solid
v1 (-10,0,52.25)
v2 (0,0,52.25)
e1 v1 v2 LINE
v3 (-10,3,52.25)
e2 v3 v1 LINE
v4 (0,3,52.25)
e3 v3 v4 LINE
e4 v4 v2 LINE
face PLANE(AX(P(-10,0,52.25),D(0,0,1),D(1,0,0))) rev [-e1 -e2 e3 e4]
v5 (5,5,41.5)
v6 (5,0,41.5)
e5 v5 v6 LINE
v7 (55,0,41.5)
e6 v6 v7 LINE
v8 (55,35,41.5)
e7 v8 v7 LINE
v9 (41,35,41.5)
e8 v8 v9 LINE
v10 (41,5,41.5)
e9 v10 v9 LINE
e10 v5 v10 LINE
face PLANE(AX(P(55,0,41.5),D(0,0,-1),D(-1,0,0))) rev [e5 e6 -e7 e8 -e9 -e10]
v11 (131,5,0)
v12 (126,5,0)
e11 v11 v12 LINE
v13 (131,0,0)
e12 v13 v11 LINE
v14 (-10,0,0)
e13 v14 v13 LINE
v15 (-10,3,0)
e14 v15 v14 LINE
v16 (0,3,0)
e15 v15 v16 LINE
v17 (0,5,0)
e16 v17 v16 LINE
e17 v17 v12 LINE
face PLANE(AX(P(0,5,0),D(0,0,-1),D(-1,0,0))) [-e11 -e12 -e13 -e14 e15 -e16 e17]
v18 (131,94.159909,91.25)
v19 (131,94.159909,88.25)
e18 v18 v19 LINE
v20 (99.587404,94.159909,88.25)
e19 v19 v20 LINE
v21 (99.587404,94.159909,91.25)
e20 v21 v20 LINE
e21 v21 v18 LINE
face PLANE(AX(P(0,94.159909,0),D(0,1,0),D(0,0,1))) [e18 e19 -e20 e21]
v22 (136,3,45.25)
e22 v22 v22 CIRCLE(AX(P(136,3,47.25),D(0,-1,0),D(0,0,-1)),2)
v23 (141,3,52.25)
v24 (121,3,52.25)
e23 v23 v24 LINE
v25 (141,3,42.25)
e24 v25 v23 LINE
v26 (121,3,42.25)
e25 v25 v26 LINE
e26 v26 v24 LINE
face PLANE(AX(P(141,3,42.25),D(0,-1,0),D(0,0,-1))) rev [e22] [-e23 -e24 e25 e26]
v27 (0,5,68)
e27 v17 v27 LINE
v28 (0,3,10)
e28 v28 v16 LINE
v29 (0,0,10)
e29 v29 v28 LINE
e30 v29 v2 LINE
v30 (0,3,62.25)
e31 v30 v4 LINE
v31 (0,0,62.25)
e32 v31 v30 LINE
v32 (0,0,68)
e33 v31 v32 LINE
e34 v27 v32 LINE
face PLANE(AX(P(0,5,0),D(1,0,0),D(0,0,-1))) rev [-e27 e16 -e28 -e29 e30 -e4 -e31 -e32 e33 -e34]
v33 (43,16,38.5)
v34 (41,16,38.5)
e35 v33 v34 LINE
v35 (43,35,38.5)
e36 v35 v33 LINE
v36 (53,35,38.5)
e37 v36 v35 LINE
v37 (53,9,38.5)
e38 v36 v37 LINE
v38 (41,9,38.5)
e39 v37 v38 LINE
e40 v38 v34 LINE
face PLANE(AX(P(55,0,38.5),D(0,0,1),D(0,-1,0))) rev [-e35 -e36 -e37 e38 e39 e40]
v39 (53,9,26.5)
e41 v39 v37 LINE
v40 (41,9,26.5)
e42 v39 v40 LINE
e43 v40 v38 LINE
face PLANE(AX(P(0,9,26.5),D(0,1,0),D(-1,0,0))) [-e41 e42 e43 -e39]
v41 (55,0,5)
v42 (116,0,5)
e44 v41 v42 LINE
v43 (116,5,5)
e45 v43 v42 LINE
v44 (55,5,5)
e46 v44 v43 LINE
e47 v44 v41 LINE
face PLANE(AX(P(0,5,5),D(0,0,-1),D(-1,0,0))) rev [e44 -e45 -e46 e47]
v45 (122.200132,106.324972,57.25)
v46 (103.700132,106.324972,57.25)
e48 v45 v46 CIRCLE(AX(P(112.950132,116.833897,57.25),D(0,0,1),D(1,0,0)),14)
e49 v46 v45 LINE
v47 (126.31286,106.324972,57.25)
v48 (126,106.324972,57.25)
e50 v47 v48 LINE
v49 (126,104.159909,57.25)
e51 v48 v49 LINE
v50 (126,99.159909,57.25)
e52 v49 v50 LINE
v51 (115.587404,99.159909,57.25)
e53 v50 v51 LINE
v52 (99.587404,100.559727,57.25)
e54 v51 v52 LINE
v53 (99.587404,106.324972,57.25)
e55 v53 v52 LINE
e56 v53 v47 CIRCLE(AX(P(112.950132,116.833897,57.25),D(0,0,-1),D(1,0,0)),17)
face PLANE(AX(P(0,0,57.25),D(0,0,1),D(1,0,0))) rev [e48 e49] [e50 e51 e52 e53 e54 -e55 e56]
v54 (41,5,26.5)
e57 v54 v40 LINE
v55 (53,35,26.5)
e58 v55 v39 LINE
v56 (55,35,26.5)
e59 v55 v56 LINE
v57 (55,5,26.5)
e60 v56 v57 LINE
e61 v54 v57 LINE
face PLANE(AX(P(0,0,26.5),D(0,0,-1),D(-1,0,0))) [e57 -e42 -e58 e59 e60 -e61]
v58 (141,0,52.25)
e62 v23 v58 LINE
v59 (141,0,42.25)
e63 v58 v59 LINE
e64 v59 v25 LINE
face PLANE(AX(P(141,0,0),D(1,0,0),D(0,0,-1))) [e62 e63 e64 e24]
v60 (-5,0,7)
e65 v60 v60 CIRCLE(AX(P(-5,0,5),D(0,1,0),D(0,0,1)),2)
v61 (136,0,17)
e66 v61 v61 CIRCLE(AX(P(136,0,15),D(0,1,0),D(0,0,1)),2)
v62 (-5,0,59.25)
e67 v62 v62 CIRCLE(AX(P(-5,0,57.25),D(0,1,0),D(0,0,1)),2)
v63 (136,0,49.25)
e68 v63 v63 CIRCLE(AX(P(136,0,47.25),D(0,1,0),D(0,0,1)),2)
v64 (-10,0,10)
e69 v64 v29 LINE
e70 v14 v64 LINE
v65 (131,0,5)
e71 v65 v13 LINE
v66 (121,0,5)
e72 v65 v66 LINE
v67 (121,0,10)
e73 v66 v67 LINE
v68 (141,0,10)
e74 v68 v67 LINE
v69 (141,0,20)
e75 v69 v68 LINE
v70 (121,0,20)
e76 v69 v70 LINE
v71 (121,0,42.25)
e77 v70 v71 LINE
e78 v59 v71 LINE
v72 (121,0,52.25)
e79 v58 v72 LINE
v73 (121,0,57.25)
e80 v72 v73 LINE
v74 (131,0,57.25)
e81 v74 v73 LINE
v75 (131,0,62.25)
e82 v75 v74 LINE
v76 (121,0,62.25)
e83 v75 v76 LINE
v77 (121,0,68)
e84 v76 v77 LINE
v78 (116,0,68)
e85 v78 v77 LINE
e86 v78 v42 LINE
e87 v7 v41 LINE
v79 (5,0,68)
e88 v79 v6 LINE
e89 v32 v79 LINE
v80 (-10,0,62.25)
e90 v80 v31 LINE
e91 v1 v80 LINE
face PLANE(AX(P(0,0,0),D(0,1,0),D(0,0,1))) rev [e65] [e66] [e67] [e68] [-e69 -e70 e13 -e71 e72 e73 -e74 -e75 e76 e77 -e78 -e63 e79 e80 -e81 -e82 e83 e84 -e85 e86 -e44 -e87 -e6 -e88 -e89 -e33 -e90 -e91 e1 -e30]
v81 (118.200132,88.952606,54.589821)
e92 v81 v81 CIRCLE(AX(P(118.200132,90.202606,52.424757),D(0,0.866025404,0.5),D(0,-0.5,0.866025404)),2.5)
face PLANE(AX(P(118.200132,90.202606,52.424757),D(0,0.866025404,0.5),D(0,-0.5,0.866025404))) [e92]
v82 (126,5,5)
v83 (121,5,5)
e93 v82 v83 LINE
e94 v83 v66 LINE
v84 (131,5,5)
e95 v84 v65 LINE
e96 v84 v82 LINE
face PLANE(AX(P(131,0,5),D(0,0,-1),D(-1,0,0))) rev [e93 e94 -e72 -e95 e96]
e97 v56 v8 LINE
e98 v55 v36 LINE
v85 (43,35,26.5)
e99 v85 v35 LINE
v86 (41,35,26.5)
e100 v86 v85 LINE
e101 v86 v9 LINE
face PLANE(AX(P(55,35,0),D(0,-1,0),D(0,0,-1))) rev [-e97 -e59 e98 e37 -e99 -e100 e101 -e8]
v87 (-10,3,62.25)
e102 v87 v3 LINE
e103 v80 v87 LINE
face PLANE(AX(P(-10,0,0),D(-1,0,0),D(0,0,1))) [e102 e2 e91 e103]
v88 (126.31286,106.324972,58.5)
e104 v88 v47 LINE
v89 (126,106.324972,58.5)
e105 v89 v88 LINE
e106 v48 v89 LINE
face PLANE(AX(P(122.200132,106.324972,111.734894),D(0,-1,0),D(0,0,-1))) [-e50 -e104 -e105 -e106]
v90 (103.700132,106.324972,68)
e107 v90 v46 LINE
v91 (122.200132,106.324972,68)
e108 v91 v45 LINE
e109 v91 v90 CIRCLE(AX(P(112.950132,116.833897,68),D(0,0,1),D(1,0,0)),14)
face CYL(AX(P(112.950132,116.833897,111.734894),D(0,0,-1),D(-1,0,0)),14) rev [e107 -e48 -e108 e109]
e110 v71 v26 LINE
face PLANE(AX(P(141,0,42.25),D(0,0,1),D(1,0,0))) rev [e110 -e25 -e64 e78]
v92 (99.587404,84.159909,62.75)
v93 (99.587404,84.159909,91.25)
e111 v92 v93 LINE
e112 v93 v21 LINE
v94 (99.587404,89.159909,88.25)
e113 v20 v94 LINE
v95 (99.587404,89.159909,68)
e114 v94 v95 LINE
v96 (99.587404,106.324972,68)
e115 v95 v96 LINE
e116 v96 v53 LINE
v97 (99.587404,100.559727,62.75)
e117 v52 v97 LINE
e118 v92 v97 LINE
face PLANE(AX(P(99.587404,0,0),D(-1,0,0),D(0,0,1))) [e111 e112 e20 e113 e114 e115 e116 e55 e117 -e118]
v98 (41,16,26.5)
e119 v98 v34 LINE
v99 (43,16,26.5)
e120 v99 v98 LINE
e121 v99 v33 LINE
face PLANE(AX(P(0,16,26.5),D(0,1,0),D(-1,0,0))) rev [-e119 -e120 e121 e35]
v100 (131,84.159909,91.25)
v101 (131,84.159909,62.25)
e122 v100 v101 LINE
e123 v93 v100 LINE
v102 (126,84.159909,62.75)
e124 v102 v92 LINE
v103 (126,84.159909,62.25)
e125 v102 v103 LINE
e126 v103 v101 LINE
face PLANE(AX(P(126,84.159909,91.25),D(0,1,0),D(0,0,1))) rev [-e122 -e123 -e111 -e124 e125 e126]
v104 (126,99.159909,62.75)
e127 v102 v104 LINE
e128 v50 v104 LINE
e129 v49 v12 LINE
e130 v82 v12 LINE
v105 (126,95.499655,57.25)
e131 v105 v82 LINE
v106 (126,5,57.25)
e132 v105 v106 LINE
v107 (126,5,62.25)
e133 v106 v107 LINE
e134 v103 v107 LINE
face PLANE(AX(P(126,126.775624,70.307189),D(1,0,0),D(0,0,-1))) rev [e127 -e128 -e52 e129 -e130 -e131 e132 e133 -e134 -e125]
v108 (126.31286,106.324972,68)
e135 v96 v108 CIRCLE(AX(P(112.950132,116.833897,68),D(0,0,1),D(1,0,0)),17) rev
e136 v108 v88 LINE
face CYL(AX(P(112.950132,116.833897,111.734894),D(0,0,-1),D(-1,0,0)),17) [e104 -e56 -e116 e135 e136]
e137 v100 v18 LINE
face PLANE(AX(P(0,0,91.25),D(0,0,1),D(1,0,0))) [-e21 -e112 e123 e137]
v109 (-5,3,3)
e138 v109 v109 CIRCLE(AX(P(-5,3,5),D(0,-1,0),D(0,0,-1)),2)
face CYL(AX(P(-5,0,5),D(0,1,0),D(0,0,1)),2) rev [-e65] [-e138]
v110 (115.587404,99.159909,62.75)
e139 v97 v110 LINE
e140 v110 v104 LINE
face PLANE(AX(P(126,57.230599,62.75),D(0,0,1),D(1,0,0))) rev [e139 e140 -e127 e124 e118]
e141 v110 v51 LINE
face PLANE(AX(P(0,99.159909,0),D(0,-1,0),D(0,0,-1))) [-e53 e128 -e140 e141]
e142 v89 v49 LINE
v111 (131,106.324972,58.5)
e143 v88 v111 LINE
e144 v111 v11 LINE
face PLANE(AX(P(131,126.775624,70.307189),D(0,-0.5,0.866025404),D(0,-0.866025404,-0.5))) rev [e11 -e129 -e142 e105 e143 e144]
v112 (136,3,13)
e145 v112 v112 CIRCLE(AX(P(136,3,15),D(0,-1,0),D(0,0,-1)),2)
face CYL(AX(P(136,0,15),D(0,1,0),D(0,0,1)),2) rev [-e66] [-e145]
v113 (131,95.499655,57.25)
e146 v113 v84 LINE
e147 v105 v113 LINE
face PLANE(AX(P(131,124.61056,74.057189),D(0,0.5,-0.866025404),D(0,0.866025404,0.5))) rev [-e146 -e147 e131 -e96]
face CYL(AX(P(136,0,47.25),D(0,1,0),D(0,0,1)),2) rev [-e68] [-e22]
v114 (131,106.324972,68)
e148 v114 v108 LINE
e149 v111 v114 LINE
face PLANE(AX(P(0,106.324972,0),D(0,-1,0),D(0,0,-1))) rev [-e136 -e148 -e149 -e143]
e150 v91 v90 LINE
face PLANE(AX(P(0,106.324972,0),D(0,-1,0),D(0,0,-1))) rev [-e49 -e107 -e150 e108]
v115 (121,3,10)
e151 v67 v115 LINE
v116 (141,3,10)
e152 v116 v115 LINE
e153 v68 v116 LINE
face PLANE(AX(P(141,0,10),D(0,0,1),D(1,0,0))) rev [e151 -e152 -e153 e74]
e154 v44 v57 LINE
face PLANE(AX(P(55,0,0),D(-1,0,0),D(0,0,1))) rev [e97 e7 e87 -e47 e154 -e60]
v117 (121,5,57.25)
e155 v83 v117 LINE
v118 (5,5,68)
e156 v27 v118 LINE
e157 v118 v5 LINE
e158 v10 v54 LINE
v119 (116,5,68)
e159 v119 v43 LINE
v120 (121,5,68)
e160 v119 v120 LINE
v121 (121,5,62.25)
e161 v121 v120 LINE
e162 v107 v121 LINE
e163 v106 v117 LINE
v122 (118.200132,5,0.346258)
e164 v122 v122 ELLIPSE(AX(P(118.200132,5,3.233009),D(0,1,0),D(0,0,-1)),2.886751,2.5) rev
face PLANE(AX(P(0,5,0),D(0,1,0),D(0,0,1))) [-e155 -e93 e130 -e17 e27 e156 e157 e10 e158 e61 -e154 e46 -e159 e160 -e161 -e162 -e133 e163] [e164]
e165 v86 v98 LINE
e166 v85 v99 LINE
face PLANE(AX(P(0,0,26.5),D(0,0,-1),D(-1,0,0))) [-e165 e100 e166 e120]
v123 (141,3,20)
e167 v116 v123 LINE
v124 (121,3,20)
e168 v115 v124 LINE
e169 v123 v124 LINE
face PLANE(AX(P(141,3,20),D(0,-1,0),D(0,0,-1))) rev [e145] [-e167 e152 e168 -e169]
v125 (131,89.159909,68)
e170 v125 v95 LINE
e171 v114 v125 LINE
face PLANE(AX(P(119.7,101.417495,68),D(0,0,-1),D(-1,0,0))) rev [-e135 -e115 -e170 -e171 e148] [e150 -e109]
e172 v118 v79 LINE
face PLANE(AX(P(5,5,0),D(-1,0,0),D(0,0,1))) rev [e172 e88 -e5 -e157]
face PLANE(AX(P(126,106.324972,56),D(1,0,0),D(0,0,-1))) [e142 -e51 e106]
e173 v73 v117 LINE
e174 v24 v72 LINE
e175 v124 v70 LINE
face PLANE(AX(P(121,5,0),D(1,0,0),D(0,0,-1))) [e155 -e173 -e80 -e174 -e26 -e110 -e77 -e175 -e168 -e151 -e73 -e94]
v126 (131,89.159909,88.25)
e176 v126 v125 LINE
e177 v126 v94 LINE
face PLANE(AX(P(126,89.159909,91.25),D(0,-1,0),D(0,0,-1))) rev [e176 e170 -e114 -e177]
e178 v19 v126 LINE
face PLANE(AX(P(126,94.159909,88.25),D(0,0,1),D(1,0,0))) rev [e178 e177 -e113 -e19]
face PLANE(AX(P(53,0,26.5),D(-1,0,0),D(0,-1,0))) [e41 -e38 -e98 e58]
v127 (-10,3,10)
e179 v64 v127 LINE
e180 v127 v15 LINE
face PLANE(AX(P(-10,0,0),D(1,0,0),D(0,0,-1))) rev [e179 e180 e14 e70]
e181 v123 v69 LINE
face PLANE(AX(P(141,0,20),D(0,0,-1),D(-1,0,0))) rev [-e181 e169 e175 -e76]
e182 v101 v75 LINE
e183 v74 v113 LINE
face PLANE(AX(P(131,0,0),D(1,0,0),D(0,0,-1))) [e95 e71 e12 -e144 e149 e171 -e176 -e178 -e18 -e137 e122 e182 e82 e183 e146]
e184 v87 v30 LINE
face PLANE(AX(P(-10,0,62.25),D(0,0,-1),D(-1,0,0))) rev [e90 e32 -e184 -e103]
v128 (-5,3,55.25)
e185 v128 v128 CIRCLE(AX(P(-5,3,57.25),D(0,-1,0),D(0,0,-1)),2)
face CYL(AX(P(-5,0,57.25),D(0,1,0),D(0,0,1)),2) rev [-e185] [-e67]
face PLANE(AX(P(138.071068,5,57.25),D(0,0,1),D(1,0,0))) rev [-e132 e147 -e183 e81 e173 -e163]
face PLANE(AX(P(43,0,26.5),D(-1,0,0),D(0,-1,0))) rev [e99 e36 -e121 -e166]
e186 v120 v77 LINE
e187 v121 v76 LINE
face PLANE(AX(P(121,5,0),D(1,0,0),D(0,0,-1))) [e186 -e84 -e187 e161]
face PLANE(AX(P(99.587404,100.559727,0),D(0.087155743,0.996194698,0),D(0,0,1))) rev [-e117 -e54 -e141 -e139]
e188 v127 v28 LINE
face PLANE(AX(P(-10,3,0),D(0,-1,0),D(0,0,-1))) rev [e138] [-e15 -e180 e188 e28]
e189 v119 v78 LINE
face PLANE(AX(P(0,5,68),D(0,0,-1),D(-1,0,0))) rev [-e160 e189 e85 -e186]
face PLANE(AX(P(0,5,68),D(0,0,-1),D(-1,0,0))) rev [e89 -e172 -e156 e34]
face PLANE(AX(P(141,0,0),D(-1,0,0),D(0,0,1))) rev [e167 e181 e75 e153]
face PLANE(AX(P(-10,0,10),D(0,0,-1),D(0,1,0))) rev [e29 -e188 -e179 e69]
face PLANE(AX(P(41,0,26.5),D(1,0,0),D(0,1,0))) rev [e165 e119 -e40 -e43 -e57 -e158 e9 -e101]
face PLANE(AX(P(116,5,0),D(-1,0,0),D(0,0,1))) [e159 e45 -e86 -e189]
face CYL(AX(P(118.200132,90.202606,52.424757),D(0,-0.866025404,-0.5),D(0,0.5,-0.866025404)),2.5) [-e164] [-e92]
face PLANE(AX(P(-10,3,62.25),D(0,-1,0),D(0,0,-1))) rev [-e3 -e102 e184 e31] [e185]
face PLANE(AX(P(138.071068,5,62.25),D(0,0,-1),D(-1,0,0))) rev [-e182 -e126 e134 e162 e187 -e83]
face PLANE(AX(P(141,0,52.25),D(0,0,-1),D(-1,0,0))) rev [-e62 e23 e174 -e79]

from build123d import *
from OCP.BRepAlgoAPI import BRepAlgoAPI_Cut
from OCP.TopTools import TopTools_ListOfShape

# Parameters (mm, degrees)
BOSS_EXTRUDE1_DEPTH              = 5
SKETCH2_R                        = 2.5
BOSS_EXTRUDE2_DEPTH              = 100
SKETCH3_W                        = 5
SKETCH3_H                        = 5
BOSS_EXTRUDE3_DEPTH              = 10
SKETCH5_W                        = 5
SKETCH5_H                        = 4.330127019
BOSS_EXTRUDE4_DEPTH              = 117
SKETCH6_W                        = 5
SKETCH6_H                        = 5
BOSS_EXTRUDE5_DEPTH              = 20
BOSS_EXTRUDE6_DEPTH              = 15
SKETCH9_W                        = 5
SKETCH9_H                        = 5
BOSS_EXTRUDE7_DEPTH              = 10
SKETCH10_W                       = 5
SKETCH10_H                       = 5
BOSS_EXTRUDE8_DEPTH              = 99.159909
SKETCH11_W                       = 10
SKETCH11_H                       = 3
BOSS_EXTRUDE9_DEPTH              = 10
CUT_EXTRUDE1_DEPTH               = 187.084790711
CUT_EXTRUDE1_DEPTH_BACK          = 187.084790711
SKETCH13_R                       = 2
SKETCH14_W                       = 10
SKETCH14_H                       = 3
BOSS_EXTRUDE10_DEPTH             = 20
CUT_EXTRUDE2_DEPTH               = 194.255140511
CUT_EXTRUDE2_DEPTH_BACK          = 194.255140511
SKETCH15_R                       = 2
BOSS_EXTRUDE11_DEPTH             = 7.8
CUT_EXTRUDE3_DEPTH               = 187.016127587
CUT_EXTRUDE3_DEPTH_BACK          = 187.016127587
SKETCH17_W                       = 22.17902444
SKETCH17_H                       = 20
BOSS_EXTRUDE12_DEPTH             = 5.75
BOSS_EXTRUDE12_DEPTH_BACK        = 5
SKETCH19_W                       = 1.5
SKETCH19_H                       = 10.75
BOSS_EXTRUDE13_DEPTH             = 2.742414
SKETCH21_W                       = 1.5
SKETCH21_H                       = 1
BOSS_EXTRUDE15_DEPTH             = 1
BOSS_EXTRUDE17_REACH             = 195.512
CUT_EXTRUDE4_START               = 2
SKETCH23_W                       = 7.8
SKETCH23_H                       = 12
CUT_EXTRUDE4_DEPTH               = 10
BOSS_EXTRUDE19_DEPTH             = 5
BOSS_EXTRUDE19_DEPTH_BACK        = 2.165064
SKETCH23_2_W                     = 7.8
SKETCH23_2_H                     = 12
CUT_EXTRUDE5_DEPTH               = 1.25
BOSS_EXTRUDE20_REACH             = 188.016
SKETCH25_W                       = 5
SKETCH25_H                       = 4.330127019
SKETCH26_W                       = 5
SKETCH26_H                       = 2.16506351
CUT_EXTRUDE6_DEPTH               = 5
SKETCH27_W                       = 5.75
SKETCH27_H                       = 7.16506351
BOSS_EXTRUDE21_DEPTH             = 5
SKETCH29_W                       = 3
SKETCH29_H                       = 30
BOSS_EXTRUDE22_DEPTH             = 55
SKETCH30_W                       = 5
SKETCH30_H                       = 3
BOSS_EXTRUDE23_DEPTH             = 5
SKETCH31_W                       = 5
SKETCH31_H                       = 5
BOSS_EXTRUDE24_DEPTH             = 33.5
SKETCH32_W                       = 2
SKETCH32_H                       = 19
BOSS_EXTRUDE25_DEPTH             = 12
SKETCH34_W                       = 41
SKETCH34_H                       = 3
CUT_EXTRUDE7_DEPTH               = 30
SKETCH35_W                       = 14
SKETCH35_H                       = 12
BOSS_EXTRUDE26_DEPTH             = 7
BOSS_EXTRUDE27_REACH             = 187.154
SKETCH36_W                       = 9
SKETCH36_H                       = 5
BOSS_EXTRUDE27_DIRECTION_2_REACH = 187.154
SKETCH37_W                       = 41.5
SKETCH37_H                       = 5
BOSS_EXTRUDE28_DEPTH             = 41
SKETCH38_W                       = 34.251665069
SKETCH38_H                       = 27.087918127
CUT_EXTRUDE8_DEPTH               = 185.330721404
SKETCH39_W                       = 67.684653824
SKETCH39_H                       = 30.030202731
CUT_EXTRUDE9_DEPTH               = 190.235302527
SKETCH44_W                       = 5
SKETCH44_H                       = 7.16506351
BOSS_EXTRUDE30_DEPTH             = 18.612596
BOSS_EXTRUDE31_DEPTH             = 10.75
BOSS_EXTRUDE32_DEPTH             = 5.75
SKETCH46_W                       = 5
SKETCH46_H                       = 5
EDIT_THIS_LENGTH_DEPTH           = 29
SKETCH47_W                       = 5
SKETCH47_H                       = 3
BOSS_EXTRUDE34_DEPTH             = 5
BOSS_EXTRUDE35_REACH             = 197.039
SKETCH48_W                       = 26.412596329
SKETCH48_H                       = 5.25
SKETCH50_W                       = 5
SKETCH50_H                       = 5.75
BOSS_EXTRUDE36_DEPTH             = 10
BOSS_EXTRUDE37_DEPTH             = 26.412596329
CHAMFER1_SIZE                    = 16
CHAMFER1_SIZE2                   = 1.399818616


with BuildPart() as part:
    # Sketch1 → Boss-Extrude1 (new body)
    with BuildSketch(Plane(origin=(0, 0, 0), x_dir=(1, 0, 0), z_dir=(0, 1, 0))):
        Polygon((121, 0), (0, 0), (0, -68), (5, -68), (5, -5), (116, -5), (116, -68), (121, -68), align=None)
    extrude(amount=BOSS_EXTRUDE1_DEPTH)

    # Sketch2 → Boss-Extrude2 (add)
    with BuildSketch(Plane(origin=(0, 3.75, 2.165063509), x_dir=(1, 0, 0), z_dir=(0, 0.866025403784438, 0.500000000000001))):
        with Locations(Location((118.200131686, -0.299868314, 0), (0, 0, 90))):
            Circle(SKETCH2_R)
    extrude(amount=BOSS_EXTRUDE2_DEPTH)

    # Sketch3 → Boss-Extrude3 (add)
    with BuildSketch(Plane(origin=(121, 0, 0), x_dir=(0, 0, -1), z_dir=(1, 0, 0))):
        with Locations((-2.5, 2.5)):
            Rectangle(SKETCH3_W, SKETCH3_H)
    extrude(amount=BOSS_EXTRUDE3_DEPTH)

    # Sketch5 → Boss-Extrude4 (add)
    with BuildSketch(Plane(origin=(0, 3.75, 2.165063509), x_dir=(1, 0, 0), z_dir=(0, 0.866025403784438, 0.500000000000001))):
        with Locations((128.5, 0.33493649)):
            Rectangle(SKETCH5_W, SKETCH5_H)
    extrude(amount=BOSS_EXTRUDE4_DEPTH)

    # Sketch6 → Boss-Extrude5 (add)
    with BuildSketch(Plane(origin=(0, 1.25, -2.165063509), x_dir=(-1, 0, 0), z_dir=(0, 0.5000000000000009, -0.866025403784438))):
        with Locations((-128.5, 118.830127019)):
            Rectangle(SKETCH6_W, SKETCH6_H)
    extrude(amount=BOSS_EXTRUDE5_DEPTH)

    # Sketch7 → Boss-Extrude6 (add)
    with BuildSketch(Plane.ZY.offset(-126)):
        Polygon((45.509618943, 113.824972243), (41.179491924, 116.324972243), (38.679491924, 111.994845224), (43.009618943, 109.494845224), align=None)
    extrude(amount=BOSS_EXTRUDE6_DEPTH)

    # Sketch9 → Boss-Extrude7 (add)
    with BuildSketch(Plane(origin=(121, 0, 0), x_dir=(0, 0, -1), z_dir=(1, 0, 0))):
        with Locations((-59.75, 2.5)):
            Rectangle(SKETCH9_W, SKETCH9_H)
    extrude(amount=BOSS_EXTRUDE7_DEPTH)

    # Sketch10 → Boss-Extrude8 (add)
    with BuildSketch(Plane(origin=(0, 5, 0), x_dir=(1, 0, 0), z_dir=(0, 1, 0))):
        with Locations((128.5, -59.75)):
            Rectangle(SKETCH10_W, SKETCH10_H)
    extrude(amount=BOSS_EXTRUDE8_DEPTH)

    # Sketch11 → Boss-Extrude9 (add)
    with BuildSketch(Plane.ZY):
        with Locations((57.25, 1.5)):
            Rectangle(SKETCH11_W, SKETCH11_H)
        with Locations((5, 1.5)):
            Rectangle(SKETCH11_W, SKETCH11_H)
    extrude(amount=BOSS_EXTRUDE9_DEPTH)

    # Sketch13 → Cut-Extrude1 (cut, two sides: drawn at the far end of the back side and taken through both)
    with BuildSketch(Plane(origin=(0, 3, 0), x_dir=(1, 0, 0), z_dir=(0, 1, 0)).offset(-CUT_EXTRUDE1_DEPTH_BACK)):
        with Locations(Location((-5, -5, 0), (0, 0, 270))):
            Circle(SKETCH13_R)
        with Locations(Location((-5, -57.25, 0), (0, 0, 270))):
            Circle(SKETCH13_R)
    extrude(amount=CUT_EXTRUDE1_DEPTH + CUT_EXTRUDE1_DEPTH_BACK, mode=Mode.SUBTRACT)

    # Sketch14 → Boss-Extrude10 (add)
    with BuildSketch(Plane(origin=(121, 0, 0), x_dir=(0, 0, -1), z_dir=(1, 0, 0))):
        with Locations((-15, 1.5)):
            Rectangle(SKETCH14_W, SKETCH14_H)
        with Locations((-47.25, 1.5)):
            Rectangle(SKETCH14_W, SKETCH14_H)
    extrude(amount=BOSS_EXTRUDE10_DEPTH)

    # Sketch15 → Cut-Extrude2 (cut, two sides: drawn at the far end of the back side and taken through both)
    with BuildSketch(Plane(origin=(0, 3, 0), x_dir=(1, 0, 0), z_dir=(0, 1, 0)).offset(-CUT_EXTRUDE2_DEPTH_BACK)):
        with Locations(Location((136, -15, 0), (0, 0, 270))):
            Circle(SKETCH15_R)
        with Locations(Location((136, -47.25, 0), (0, 0, 270))):
            Circle(SKETCH15_R)
    extrude(amount=CUT_EXTRUDE2_DEPTH + CUT_EXTRUDE2_DEPTH_BACK, mode=Mode.SUBTRACT)

    # Sketch16 → Boss-Extrude11 (add)
    with BuildSketch(Plane.ZY.offset(-126)):
        Polygon((49.839745962, 111.324972243), (67, 101.417494955), (64.5, 97.087367936), (47.339745962, 106.994845224), align=None)
    extrude(amount=BOSS_EXTRUDE11_DEPTH)

    # Sketch17 → Cut-Extrude3 (cut, two sides: drawn at the far end of the back side and taken through both)
    with BuildSketch(Plane(origin=(0, 105.074972243, 60.665063509), x_dir=(1, 0, 0), z_dir=(0, 0.8660254037844382, 0.500000000000001)).offset(-CUT_EXTRUDE3_DEPTH_BACK)):
        with Locations((119.91048778, 12.5)):
            Rectangle(SKETCH17_W, SKETCH17_H)
    extrude(amount=CUT_EXTRUDE3_DEPTH + CUT_EXTRUDE3_DEPTH_BACK, mode=Mode.SUBTRACT)



with BuildPart() as body_2:
    # Sketch18 → Boss-Extrude12 (new, two sides: drawn at the far end of the back side and taken through both)
    with BuildSketch(Plane.XY.offset(62.25).offset(-BOSS_EXTRUDE12_DEPTH_BACK)):
        with BuildLine():
            Line((118.2, 104.159908733), (119.7, 104.159908733))
            ThreePointArc((119.7, 104.159908733), (110.2, 113.659908733), (100.7, 104.159908733))
            Line((100.7, 104.159908733), (102.2, 104.159908733))
            ThreePointArc((102.2, 104.159908733), (110.2, 112.159908733), (118.2, 104.159908733))
        make_face()
    extrude(amount=BOSS_EXTRUDE12_DEPTH + BOSS_EXTRUDE12_DEPTH_BACK)


with BuildPart() as part_1:
    add(part.part)

    add(body_2.part)  # Boss-Extrude13 merges body 2
    # Sketch19 → Boss-Extrude13 (add)
    with BuildSketch(Plane.XZ.offset(-104.159908733)):
        with Locations((118.95, 62.625)):
            Rectangle(SKETCH19_W, SKETCH19_H)
    extrude(amount=BOSS_EXTRUDE13_DEPTH)

    # Sketch21 → Boss-Extrude15 (add)
    with BuildSketch(Plane.XZ.offset(-101.417494955)):
        with Locations((118.95, 67.5)):
            Rectangle(SKETCH21_W, SKETCH21_H)
    extrude(amount=BOSS_EXTRUDE15_DEPTH)

    # Boss-Extrude17: up to this plane
    boss_extrude17_end = Plane(origin=(119.7, 101.417494955, 68), z_dir=(0, 0, -1))
    # Sketch20 → Boss-Extrude17 (add, up to the surface)
    with BuildSketch(Plane(origin=(0, -3.657477288, 6.334936491), x_dir=(1, 0, 0), z_dir=(0, -0.5000000000000039, 0.8660254037844365)), mode=Mode.PRIVATE) as boss_extrude17_sk1:
        Polygon((126, 116.330127019), (126, 121.330127019), (119.7, 121.330127019), (118.2, 121.330127019), (118.2, 116.330127019), align=None)
    boss_extrude17_tool1 = split(extrude(boss_extrude17_sk1.sketch, amount=BOSS_EXTRUDE17_REACH, mode=Mode.PRIVATE), bisect_by=boss_extrude17_end, keep=Keep.BOTH, mode=Mode.PRIVATE)
    add(boss_extrude17_tool1.solids().sort_by_distance((122.1, 99.252431, 65.75))[0])

    # Sketch23 → Cut-Extrude4 (cut)
    with BuildSketch(Plane(origin=(0, 104.159908733, 0), x_dir=(-1, 0, 0), z_dir=(0, -1, 0)).offset(CUT_EXTRUDE4_START)):
        with Locations((-122.1, -62)):
            Rectangle(SKETCH23_W, SKETCH23_H)
    extrude(amount=CUT_EXTRUDE4_DEPTH, mode=Mode.SUBTRACT)

    # Sketch23<2> → Boss-Extrude19 (add, two sides: drawn at the far end of the back side and taken through both)
    with BuildSketch(Plane(origin=(0, 104.159908733, 0), x_dir=(-1, 0, 0), z_dir=(0, -1, 0)).offset(-BOSS_EXTRUDE19_DEPTH_BACK)):
        with Locations((-122.1, -62)):
            Rectangle(SKETCH23_2_W, SKETCH23_2_H)
    extrude(amount=BOSS_EXTRUDE19_DEPTH + BOSS_EXTRUDE19_DEPTH_BACK)


with BuildPart() as cut_extrude5_tool:
    # Sketch24 → Cut-Extrude5 (new body)
    with BuildSketch(Plane(origin=(0, 0, 56), x_dir=(-1, 0, 0), z_dir=(0, 0, -1))):
        Polygon((-126, 106.324972243), (-126, 101.994845224), (-126, 99.159908733), (-118.2, 99.159908733), (-118.2, 106.324972243), align=None)
    extrude(amount=-CUT_EXTRUDE5_DEPTH)


with BuildPart() as part_2:
    add(part_1.part)

    # Cut-Extrude5: cut by cut_extrude5_tool, with a tolerance
    cut_extrude5_stock = TopTools_ListOfShape()
    cut_extrude5_stock.Append(part_2.part.wrapped)
    cut_extrude5_tools = TopTools_ListOfShape()
    cut_extrude5_tools.Append(cut_extrude5_tool.part.wrapped)
    cut_extrude5_cut = BRepAlgoAPI_Cut()
    cut_extrude5_cut.SetArguments(cut_extrude5_stock)
    cut_extrude5_cut.SetTools(cut_extrude5_tools)
    cut_extrude5_cut.SetFuzzyValue(0.00001)
    cut_extrude5_cut.Build()
    add(Compound.cast(cut_extrude5_cut.Shape()).solids(), mode=Mode.REPLACE)

    # Boss-Extrude20: up to this face of the body (flat: up to its plane)
    boss_extrude20_end = Plane(part_2.part.faces().sort_by_distance((122.724999943, 106.324972733, 62.625))[0])
    # Sketch25 → Boss-Extrude20 (add, up to the picked face)
    with BuildSketch(Plane(origin=(0, 105.074972243, 60.665063509), x_dir=(1, 0, 0), z_dir=(0, 0.8660254037844382, 0.500000000000001)), mode=Mode.PRIVATE) as boss_extrude20_sk1:
        with Locations((128.5, 0.33493649)):
            Rectangle(SKETCH25_W, SKETCH25_H)
    boss_extrude20_tool1 = split(extrude(boss_extrude20_sk1.sketch, amount=BOSS_EXTRUDE20_REACH, mode=Mode.PRIVATE), bisect_by=boss_extrude20_end, keep=Keep.BOTH, mode=Mode.PRIVATE)
    add(boss_extrude20_tool1.solids().sort_by(Axis((128.5, 105.24244, 60.375), (0, 0.8660254037844382, 0.500000000000001)))[0])


with BuildPart() as cut_extrude6_tool:
    # Sketch26 → Cut-Extrude6 (new body)
    with BuildSketch(Plane.XY.offset(62.25)):
        with Locations((128.5, 105.242440488)):
            Rectangle(SKETCH26_W, SKETCH26_H)
    extrude(amount=CUT_EXTRUDE6_DEPTH)


with BuildPart() as part_3:
    add(part_2.part)

    # Cut-Extrude6: cut by cut_extrude6_tool, with a tolerance
    cut_extrude6_stock = TopTools_ListOfShape()
    cut_extrude6_stock.Append(part_3.part.wrapped)
    cut_extrude6_tools = TopTools_ListOfShape()
    cut_extrude6_tools.Append(cut_extrude6_tool.part.wrapped)
    cut_extrude6_cut = BRepAlgoAPI_Cut()
    cut_extrude6_cut.SetArguments(cut_extrude6_stock)
    cut_extrude6_cut.SetTools(cut_extrude6_tools)
    cut_extrude6_cut.SetFuzzyValue(0.00001)
    cut_extrude6_cut.Build()
    add(Compound.cast(cut_extrude6_cut.Shape()).solids(), mode=Mode.REPLACE)

    # Sketch27 → Boss-Extrude21 (add)
    with BuildSketch(Plane(origin=(126, 0, 0), x_dir=(0, 0, -1), z_dir=(1, 0, 0))):
        with Locations((-65.125, 102.742440488)):
            Rectangle(SKETCH27_W, SKETCH27_H)
    extrude(amount=BOSS_EXTRUDE21_DEPTH)

    # Sketch29 → Boss-Extrude22 (add)
    with BuildSketch(Plane.ZY):
        with Locations((40, 20)):
            Rectangle(SKETCH29_W, SKETCH29_H)
    extrude(amount=-BOSS_EXTRUDE22_DEPTH)

    # Sketch30 → Boss-Extrude23 (add)
    with BuildSketch(Plane.XZ.offset(-5)):
        with Locations((52.5, 40)):
            Rectangle(SKETCH30_W, SKETCH30_H)
    extrude(amount=BOSS_EXTRUDE23_DEPTH)

    # Sketch31 → Boss-Extrude24 (add)
    with BuildSketch(Plane(origin=(0, 0, 38.5), x_dir=(-1, 0, 0), z_dir=(0, 0, -1))):
        with Locations((-52.5, 2.5)):
            Rectangle(SKETCH31_W, SKETCH31_H)
    extrude(amount=BOSS_EXTRUDE24_DEPTH)

    # Sketch32 → Boss-Extrude25 (add)
    with BuildSketch(Plane(origin=(0, 0, 38.5), x_dir=(-1, 0, 0), z_dir=(0, 0, -1))):
        Polygon((-41, 9), (-53, 9), (-53, 35), (-55, 35), (-55, 7), (-41, 7), align=None)
        with Locations((-42, 25.5)):
            Rectangle(SKETCH32_W, SKETCH32_H)
    extrude(amount=BOSS_EXTRUDE25_DEPTH)

    # Sketch34 → Cut-Extrude7 (cut)
    with BuildSketch(Plane(origin=(0, 35, 0), x_dir=(1, 0, 0), z_dir=(0, 1, 0))):
        with Locations((20.5, -40)):
            Rectangle(SKETCH34_W, SKETCH34_H)
    extrude(amount=-CUT_EXTRUDE7_DEPTH, mode=Mode.SUBTRACT)

    # Sketch35 → Boss-Extrude26 (add)
    with BuildSketch(Plane.XZ.offset(-7)):
        with Locations((48, 32.5)):
            Rectangle(SKETCH35_W, SKETCH35_H)
    extrude(amount=BOSS_EXTRUDE26_DEPTH)

    # Boss-Extrude27: up to this face of the body (flat: up to its plane)
    boss_extrude27_end = Plane(part_3.part.faces().sort_by_distance((48.252808989, 19.016853933, 41.5))[0])
    # Sketch36 → Boss-Extrude27 (add, up to the picked face)
    with BuildSketch(Plane.XY.offset(38.5), mode=Mode.PRIVATE) as boss_extrude27_sk1:
        with Locations((45.5, 2.5)):
            Rectangle(SKETCH36_W, SKETCH36_H)
    boss_extrude27_tool1 = split(extrude(boss_extrude27_sk1.sketch, amount=BOSS_EXTRUDE27_REACH, mode=Mode.PRIVATE), bisect_by=boss_extrude27_end, keep=Keep.BOTH, mode=Mode.PRIVATE)
    add(boss_extrude27_tool1.solids().sort_by(Axis((45.5, 2.5, 38.5), (0, 0, 1)))[0])

    # Boss-Extrude27 direction 2: up to this face of the body (flat: up to its plane)
    boss_extrude27_direction_2_end = Plane(part_3.part.faces().sort_by_distance((27.5, 2.5, 5))[0])
    # Sketch36 → Boss-Extrude27 direction 2 (add, up to the picked face)
    with BuildSketch(Plane.XY.offset(38.5), mode=Mode.PRIVATE) as boss_extrude27_direction_2_sk1:
        with Locations((45.5, 2.5)):
            Rectangle(SKETCH36_W, SKETCH36_H)
    boss_extrude27_direction_2_tool1 = split(extrude(boss_extrude27_direction_2_sk1.sketch, amount=-BOSS_EXTRUDE27_DIRECTION_2_REACH, mode=Mode.PRIVATE), bisect_by=boss_extrude27_direction_2_end, keep=Keep.BOTH, mode=Mode.PRIVATE)
    add(boss_extrude27_direction_2_tool1.solids().sort_by(Axis((45.5, 2.5, 38.5), (0, 0, -1)))[0])

    # Sketch37 → Boss-Extrude28 (add)
    with BuildSketch(Plane.ZY.offset(-41)):
        with Locations((20.75, 2.5)):
            Rectangle(SKETCH37_W, SKETCH37_H)
    extrude(amount=BOSS_EXTRUDE28_DEPTH)

    # Sketch38 → Cut-Extrude8 (cut, through all)
    with BuildSketch(Plane.ZY.offset(-118.2)):
        with Locations((61.183105348, 109.662346151)):
            Rectangle(SKETCH38_W, SKETCH38_H)
    extrude(amount=CUT_EXTRUDE8_DEPTH, mode=Mode.SUBTRACT)

    # Sketch39 → Cut-Extrude9 (cut, through all)
    with BuildSketch(Plane(origin=(0, 106.324972243, 0), x_dir=(1, 0, 0), z_dir=(0, 1, 0))):
        with Locations((120.498501698, -57.225220953)):
            Rectangle(SKETCH39_W, SKETCH39_H)
    extrude(amount=CUT_EXTRUDE9_DEPTH, mode=Mode.SUBTRACT)

    # Sketch44 → Boss-Extrude30 (add)
    with BuildSketch(Plane.ZY.offset(-118.2)):
        with Locations((59.75, 102.742440488)):
            Rectangle(SKETCH44_W, SKETCH44_H)
    extrude(amount=BOSS_EXTRUDE30_DEPTH)

    # Sketch43 → Boss-Extrude31 (add)
    with BuildSketch(Plane(origin=(0, 0, 57.25), x_dir=(-1, 0, 0), z_dir=(0, 0, -1))):
        with BuildLine():
            Line((-122.200131686, 106.324972243), (-126, 106.324972243))
            Line((-126, 106.324972243), (-126.312859701, 106.324972243))
            ThreePointArc((-126.312859701, 106.324972243), (-112.950131686, 133.833897021), (-99.587403671, 106.324972243))
            Line((-99.587403671, 106.324972243), (-103.700131686, 106.324972243))
            ThreePointArc((-103.700131686, 106.324972243), (-112.950131686, 130.833897021), (-122.200131686, 106.324972243))
        make_face()
    extrude(amount=-BOSS_EXTRUDE31_DEPTH)

    # Sketch45 → Boss-Extrude32 (add)
    with BuildSketch(Plane.XY.offset(62.25)):
        Polygon((118.2, 99.159908733), (118.2, 106.324972243), (103.700131686, 106.324972243), (99.587403671, 106.324972243), (99.587403671, 99.159908733), align=None)
    extrude(amount=BOSS_EXTRUDE32_DEPTH)

    # Sketch46 → EDIT THIS LENGTH (add)
    with BuildSketch(Plane.XY.offset(62.25)):
        with Locations((128.5, 86.659908733)):
            Rectangle(SKETCH46_W, SKETCH46_H)
    extrude(amount=EDIT_THIS_LENGTH_DEPTH)

    # Sketch47 → Boss-Extrude34 (add)
    with BuildSketch(Plane(origin=(0, 89.159908733, 0), x_dir=(1, 0, 0), z_dir=(0, 1, 0))):
        with Locations((128.5, -89.75)):
            Rectangle(SKETCH47_W, SKETCH47_H)
    extrude(amount=BOSS_EXTRUDE34_DEPTH)

    # Boss-Extrude35: up to this face of the body (flat: up to its plane)
    boss_extrude35_end = Plane(part_3.part.faces().sort_by_distance((128.5, 84.159908733, 76.75))[0])
    # Sketch48 → Boss-Extrude35 (add, up to the picked face)
    with BuildSketch(Plane.XZ.offset(-99.159908733), mode=Mode.PRIVATE) as boss_extrude35_sk1:
        with Locations((112.793701836, 65.375)):
            Rectangle(SKETCH48_W, SKETCH48_H)
    boss_extrude35_tool1 = split(extrude(boss_extrude35_sk1.sketch, amount=BOSS_EXTRUDE35_REACH, mode=Mode.PRIVATE), bisect_by=boss_extrude35_end, keep=Keep.BOTH, mode=Mode.PRIVATE)
    add(boss_extrude35_tool1.solids().sort_by(Axis((112.793702, 99.159909, 65.375), (0, -1, 0)))[0])

    # Sketch50 → Boss-Extrude36 (add)
    with BuildSketch(Plane.XZ.offset(-99.159908733)):
        with Locations((128.5, 65.125)):
            Rectangle(SKETCH50_W, SKETCH50_H)
    extrude(amount=BOSS_EXTRUDE36_DEPTH)

    # Sketch51 → Boss-Extrude37 (add)
    with BuildSketch(Plane.ZY.offset(-126)):
        Polygon((68, 89.159908733), (68, 84.159908733), (91.25, 84.159908733), (91.25, 94.159908733), (88.25, 94.159908733), (88.25, 89.159908733), align=None)
    extrude(amount=BOSS_EXTRUDE37_DEPTH)

    # Chamfer1
    chamfer1_edges = [part_3.edges().sort_by_distance(p)[0] for p in [
        (99.587404, 99.159908733, 59.75),
    ]]
    chamfer1_side = [part_3.faces().sort_by_distance(p)[0] for p in [
        (112.793702, 99.159908733, 60),
    ]]
    chamfer(chamfer1_edges, length=CHAMFER1_SIZE, length2=CHAMFER1_SIZE2, reference=chamfer1_side[0])


solid = part_3.part
